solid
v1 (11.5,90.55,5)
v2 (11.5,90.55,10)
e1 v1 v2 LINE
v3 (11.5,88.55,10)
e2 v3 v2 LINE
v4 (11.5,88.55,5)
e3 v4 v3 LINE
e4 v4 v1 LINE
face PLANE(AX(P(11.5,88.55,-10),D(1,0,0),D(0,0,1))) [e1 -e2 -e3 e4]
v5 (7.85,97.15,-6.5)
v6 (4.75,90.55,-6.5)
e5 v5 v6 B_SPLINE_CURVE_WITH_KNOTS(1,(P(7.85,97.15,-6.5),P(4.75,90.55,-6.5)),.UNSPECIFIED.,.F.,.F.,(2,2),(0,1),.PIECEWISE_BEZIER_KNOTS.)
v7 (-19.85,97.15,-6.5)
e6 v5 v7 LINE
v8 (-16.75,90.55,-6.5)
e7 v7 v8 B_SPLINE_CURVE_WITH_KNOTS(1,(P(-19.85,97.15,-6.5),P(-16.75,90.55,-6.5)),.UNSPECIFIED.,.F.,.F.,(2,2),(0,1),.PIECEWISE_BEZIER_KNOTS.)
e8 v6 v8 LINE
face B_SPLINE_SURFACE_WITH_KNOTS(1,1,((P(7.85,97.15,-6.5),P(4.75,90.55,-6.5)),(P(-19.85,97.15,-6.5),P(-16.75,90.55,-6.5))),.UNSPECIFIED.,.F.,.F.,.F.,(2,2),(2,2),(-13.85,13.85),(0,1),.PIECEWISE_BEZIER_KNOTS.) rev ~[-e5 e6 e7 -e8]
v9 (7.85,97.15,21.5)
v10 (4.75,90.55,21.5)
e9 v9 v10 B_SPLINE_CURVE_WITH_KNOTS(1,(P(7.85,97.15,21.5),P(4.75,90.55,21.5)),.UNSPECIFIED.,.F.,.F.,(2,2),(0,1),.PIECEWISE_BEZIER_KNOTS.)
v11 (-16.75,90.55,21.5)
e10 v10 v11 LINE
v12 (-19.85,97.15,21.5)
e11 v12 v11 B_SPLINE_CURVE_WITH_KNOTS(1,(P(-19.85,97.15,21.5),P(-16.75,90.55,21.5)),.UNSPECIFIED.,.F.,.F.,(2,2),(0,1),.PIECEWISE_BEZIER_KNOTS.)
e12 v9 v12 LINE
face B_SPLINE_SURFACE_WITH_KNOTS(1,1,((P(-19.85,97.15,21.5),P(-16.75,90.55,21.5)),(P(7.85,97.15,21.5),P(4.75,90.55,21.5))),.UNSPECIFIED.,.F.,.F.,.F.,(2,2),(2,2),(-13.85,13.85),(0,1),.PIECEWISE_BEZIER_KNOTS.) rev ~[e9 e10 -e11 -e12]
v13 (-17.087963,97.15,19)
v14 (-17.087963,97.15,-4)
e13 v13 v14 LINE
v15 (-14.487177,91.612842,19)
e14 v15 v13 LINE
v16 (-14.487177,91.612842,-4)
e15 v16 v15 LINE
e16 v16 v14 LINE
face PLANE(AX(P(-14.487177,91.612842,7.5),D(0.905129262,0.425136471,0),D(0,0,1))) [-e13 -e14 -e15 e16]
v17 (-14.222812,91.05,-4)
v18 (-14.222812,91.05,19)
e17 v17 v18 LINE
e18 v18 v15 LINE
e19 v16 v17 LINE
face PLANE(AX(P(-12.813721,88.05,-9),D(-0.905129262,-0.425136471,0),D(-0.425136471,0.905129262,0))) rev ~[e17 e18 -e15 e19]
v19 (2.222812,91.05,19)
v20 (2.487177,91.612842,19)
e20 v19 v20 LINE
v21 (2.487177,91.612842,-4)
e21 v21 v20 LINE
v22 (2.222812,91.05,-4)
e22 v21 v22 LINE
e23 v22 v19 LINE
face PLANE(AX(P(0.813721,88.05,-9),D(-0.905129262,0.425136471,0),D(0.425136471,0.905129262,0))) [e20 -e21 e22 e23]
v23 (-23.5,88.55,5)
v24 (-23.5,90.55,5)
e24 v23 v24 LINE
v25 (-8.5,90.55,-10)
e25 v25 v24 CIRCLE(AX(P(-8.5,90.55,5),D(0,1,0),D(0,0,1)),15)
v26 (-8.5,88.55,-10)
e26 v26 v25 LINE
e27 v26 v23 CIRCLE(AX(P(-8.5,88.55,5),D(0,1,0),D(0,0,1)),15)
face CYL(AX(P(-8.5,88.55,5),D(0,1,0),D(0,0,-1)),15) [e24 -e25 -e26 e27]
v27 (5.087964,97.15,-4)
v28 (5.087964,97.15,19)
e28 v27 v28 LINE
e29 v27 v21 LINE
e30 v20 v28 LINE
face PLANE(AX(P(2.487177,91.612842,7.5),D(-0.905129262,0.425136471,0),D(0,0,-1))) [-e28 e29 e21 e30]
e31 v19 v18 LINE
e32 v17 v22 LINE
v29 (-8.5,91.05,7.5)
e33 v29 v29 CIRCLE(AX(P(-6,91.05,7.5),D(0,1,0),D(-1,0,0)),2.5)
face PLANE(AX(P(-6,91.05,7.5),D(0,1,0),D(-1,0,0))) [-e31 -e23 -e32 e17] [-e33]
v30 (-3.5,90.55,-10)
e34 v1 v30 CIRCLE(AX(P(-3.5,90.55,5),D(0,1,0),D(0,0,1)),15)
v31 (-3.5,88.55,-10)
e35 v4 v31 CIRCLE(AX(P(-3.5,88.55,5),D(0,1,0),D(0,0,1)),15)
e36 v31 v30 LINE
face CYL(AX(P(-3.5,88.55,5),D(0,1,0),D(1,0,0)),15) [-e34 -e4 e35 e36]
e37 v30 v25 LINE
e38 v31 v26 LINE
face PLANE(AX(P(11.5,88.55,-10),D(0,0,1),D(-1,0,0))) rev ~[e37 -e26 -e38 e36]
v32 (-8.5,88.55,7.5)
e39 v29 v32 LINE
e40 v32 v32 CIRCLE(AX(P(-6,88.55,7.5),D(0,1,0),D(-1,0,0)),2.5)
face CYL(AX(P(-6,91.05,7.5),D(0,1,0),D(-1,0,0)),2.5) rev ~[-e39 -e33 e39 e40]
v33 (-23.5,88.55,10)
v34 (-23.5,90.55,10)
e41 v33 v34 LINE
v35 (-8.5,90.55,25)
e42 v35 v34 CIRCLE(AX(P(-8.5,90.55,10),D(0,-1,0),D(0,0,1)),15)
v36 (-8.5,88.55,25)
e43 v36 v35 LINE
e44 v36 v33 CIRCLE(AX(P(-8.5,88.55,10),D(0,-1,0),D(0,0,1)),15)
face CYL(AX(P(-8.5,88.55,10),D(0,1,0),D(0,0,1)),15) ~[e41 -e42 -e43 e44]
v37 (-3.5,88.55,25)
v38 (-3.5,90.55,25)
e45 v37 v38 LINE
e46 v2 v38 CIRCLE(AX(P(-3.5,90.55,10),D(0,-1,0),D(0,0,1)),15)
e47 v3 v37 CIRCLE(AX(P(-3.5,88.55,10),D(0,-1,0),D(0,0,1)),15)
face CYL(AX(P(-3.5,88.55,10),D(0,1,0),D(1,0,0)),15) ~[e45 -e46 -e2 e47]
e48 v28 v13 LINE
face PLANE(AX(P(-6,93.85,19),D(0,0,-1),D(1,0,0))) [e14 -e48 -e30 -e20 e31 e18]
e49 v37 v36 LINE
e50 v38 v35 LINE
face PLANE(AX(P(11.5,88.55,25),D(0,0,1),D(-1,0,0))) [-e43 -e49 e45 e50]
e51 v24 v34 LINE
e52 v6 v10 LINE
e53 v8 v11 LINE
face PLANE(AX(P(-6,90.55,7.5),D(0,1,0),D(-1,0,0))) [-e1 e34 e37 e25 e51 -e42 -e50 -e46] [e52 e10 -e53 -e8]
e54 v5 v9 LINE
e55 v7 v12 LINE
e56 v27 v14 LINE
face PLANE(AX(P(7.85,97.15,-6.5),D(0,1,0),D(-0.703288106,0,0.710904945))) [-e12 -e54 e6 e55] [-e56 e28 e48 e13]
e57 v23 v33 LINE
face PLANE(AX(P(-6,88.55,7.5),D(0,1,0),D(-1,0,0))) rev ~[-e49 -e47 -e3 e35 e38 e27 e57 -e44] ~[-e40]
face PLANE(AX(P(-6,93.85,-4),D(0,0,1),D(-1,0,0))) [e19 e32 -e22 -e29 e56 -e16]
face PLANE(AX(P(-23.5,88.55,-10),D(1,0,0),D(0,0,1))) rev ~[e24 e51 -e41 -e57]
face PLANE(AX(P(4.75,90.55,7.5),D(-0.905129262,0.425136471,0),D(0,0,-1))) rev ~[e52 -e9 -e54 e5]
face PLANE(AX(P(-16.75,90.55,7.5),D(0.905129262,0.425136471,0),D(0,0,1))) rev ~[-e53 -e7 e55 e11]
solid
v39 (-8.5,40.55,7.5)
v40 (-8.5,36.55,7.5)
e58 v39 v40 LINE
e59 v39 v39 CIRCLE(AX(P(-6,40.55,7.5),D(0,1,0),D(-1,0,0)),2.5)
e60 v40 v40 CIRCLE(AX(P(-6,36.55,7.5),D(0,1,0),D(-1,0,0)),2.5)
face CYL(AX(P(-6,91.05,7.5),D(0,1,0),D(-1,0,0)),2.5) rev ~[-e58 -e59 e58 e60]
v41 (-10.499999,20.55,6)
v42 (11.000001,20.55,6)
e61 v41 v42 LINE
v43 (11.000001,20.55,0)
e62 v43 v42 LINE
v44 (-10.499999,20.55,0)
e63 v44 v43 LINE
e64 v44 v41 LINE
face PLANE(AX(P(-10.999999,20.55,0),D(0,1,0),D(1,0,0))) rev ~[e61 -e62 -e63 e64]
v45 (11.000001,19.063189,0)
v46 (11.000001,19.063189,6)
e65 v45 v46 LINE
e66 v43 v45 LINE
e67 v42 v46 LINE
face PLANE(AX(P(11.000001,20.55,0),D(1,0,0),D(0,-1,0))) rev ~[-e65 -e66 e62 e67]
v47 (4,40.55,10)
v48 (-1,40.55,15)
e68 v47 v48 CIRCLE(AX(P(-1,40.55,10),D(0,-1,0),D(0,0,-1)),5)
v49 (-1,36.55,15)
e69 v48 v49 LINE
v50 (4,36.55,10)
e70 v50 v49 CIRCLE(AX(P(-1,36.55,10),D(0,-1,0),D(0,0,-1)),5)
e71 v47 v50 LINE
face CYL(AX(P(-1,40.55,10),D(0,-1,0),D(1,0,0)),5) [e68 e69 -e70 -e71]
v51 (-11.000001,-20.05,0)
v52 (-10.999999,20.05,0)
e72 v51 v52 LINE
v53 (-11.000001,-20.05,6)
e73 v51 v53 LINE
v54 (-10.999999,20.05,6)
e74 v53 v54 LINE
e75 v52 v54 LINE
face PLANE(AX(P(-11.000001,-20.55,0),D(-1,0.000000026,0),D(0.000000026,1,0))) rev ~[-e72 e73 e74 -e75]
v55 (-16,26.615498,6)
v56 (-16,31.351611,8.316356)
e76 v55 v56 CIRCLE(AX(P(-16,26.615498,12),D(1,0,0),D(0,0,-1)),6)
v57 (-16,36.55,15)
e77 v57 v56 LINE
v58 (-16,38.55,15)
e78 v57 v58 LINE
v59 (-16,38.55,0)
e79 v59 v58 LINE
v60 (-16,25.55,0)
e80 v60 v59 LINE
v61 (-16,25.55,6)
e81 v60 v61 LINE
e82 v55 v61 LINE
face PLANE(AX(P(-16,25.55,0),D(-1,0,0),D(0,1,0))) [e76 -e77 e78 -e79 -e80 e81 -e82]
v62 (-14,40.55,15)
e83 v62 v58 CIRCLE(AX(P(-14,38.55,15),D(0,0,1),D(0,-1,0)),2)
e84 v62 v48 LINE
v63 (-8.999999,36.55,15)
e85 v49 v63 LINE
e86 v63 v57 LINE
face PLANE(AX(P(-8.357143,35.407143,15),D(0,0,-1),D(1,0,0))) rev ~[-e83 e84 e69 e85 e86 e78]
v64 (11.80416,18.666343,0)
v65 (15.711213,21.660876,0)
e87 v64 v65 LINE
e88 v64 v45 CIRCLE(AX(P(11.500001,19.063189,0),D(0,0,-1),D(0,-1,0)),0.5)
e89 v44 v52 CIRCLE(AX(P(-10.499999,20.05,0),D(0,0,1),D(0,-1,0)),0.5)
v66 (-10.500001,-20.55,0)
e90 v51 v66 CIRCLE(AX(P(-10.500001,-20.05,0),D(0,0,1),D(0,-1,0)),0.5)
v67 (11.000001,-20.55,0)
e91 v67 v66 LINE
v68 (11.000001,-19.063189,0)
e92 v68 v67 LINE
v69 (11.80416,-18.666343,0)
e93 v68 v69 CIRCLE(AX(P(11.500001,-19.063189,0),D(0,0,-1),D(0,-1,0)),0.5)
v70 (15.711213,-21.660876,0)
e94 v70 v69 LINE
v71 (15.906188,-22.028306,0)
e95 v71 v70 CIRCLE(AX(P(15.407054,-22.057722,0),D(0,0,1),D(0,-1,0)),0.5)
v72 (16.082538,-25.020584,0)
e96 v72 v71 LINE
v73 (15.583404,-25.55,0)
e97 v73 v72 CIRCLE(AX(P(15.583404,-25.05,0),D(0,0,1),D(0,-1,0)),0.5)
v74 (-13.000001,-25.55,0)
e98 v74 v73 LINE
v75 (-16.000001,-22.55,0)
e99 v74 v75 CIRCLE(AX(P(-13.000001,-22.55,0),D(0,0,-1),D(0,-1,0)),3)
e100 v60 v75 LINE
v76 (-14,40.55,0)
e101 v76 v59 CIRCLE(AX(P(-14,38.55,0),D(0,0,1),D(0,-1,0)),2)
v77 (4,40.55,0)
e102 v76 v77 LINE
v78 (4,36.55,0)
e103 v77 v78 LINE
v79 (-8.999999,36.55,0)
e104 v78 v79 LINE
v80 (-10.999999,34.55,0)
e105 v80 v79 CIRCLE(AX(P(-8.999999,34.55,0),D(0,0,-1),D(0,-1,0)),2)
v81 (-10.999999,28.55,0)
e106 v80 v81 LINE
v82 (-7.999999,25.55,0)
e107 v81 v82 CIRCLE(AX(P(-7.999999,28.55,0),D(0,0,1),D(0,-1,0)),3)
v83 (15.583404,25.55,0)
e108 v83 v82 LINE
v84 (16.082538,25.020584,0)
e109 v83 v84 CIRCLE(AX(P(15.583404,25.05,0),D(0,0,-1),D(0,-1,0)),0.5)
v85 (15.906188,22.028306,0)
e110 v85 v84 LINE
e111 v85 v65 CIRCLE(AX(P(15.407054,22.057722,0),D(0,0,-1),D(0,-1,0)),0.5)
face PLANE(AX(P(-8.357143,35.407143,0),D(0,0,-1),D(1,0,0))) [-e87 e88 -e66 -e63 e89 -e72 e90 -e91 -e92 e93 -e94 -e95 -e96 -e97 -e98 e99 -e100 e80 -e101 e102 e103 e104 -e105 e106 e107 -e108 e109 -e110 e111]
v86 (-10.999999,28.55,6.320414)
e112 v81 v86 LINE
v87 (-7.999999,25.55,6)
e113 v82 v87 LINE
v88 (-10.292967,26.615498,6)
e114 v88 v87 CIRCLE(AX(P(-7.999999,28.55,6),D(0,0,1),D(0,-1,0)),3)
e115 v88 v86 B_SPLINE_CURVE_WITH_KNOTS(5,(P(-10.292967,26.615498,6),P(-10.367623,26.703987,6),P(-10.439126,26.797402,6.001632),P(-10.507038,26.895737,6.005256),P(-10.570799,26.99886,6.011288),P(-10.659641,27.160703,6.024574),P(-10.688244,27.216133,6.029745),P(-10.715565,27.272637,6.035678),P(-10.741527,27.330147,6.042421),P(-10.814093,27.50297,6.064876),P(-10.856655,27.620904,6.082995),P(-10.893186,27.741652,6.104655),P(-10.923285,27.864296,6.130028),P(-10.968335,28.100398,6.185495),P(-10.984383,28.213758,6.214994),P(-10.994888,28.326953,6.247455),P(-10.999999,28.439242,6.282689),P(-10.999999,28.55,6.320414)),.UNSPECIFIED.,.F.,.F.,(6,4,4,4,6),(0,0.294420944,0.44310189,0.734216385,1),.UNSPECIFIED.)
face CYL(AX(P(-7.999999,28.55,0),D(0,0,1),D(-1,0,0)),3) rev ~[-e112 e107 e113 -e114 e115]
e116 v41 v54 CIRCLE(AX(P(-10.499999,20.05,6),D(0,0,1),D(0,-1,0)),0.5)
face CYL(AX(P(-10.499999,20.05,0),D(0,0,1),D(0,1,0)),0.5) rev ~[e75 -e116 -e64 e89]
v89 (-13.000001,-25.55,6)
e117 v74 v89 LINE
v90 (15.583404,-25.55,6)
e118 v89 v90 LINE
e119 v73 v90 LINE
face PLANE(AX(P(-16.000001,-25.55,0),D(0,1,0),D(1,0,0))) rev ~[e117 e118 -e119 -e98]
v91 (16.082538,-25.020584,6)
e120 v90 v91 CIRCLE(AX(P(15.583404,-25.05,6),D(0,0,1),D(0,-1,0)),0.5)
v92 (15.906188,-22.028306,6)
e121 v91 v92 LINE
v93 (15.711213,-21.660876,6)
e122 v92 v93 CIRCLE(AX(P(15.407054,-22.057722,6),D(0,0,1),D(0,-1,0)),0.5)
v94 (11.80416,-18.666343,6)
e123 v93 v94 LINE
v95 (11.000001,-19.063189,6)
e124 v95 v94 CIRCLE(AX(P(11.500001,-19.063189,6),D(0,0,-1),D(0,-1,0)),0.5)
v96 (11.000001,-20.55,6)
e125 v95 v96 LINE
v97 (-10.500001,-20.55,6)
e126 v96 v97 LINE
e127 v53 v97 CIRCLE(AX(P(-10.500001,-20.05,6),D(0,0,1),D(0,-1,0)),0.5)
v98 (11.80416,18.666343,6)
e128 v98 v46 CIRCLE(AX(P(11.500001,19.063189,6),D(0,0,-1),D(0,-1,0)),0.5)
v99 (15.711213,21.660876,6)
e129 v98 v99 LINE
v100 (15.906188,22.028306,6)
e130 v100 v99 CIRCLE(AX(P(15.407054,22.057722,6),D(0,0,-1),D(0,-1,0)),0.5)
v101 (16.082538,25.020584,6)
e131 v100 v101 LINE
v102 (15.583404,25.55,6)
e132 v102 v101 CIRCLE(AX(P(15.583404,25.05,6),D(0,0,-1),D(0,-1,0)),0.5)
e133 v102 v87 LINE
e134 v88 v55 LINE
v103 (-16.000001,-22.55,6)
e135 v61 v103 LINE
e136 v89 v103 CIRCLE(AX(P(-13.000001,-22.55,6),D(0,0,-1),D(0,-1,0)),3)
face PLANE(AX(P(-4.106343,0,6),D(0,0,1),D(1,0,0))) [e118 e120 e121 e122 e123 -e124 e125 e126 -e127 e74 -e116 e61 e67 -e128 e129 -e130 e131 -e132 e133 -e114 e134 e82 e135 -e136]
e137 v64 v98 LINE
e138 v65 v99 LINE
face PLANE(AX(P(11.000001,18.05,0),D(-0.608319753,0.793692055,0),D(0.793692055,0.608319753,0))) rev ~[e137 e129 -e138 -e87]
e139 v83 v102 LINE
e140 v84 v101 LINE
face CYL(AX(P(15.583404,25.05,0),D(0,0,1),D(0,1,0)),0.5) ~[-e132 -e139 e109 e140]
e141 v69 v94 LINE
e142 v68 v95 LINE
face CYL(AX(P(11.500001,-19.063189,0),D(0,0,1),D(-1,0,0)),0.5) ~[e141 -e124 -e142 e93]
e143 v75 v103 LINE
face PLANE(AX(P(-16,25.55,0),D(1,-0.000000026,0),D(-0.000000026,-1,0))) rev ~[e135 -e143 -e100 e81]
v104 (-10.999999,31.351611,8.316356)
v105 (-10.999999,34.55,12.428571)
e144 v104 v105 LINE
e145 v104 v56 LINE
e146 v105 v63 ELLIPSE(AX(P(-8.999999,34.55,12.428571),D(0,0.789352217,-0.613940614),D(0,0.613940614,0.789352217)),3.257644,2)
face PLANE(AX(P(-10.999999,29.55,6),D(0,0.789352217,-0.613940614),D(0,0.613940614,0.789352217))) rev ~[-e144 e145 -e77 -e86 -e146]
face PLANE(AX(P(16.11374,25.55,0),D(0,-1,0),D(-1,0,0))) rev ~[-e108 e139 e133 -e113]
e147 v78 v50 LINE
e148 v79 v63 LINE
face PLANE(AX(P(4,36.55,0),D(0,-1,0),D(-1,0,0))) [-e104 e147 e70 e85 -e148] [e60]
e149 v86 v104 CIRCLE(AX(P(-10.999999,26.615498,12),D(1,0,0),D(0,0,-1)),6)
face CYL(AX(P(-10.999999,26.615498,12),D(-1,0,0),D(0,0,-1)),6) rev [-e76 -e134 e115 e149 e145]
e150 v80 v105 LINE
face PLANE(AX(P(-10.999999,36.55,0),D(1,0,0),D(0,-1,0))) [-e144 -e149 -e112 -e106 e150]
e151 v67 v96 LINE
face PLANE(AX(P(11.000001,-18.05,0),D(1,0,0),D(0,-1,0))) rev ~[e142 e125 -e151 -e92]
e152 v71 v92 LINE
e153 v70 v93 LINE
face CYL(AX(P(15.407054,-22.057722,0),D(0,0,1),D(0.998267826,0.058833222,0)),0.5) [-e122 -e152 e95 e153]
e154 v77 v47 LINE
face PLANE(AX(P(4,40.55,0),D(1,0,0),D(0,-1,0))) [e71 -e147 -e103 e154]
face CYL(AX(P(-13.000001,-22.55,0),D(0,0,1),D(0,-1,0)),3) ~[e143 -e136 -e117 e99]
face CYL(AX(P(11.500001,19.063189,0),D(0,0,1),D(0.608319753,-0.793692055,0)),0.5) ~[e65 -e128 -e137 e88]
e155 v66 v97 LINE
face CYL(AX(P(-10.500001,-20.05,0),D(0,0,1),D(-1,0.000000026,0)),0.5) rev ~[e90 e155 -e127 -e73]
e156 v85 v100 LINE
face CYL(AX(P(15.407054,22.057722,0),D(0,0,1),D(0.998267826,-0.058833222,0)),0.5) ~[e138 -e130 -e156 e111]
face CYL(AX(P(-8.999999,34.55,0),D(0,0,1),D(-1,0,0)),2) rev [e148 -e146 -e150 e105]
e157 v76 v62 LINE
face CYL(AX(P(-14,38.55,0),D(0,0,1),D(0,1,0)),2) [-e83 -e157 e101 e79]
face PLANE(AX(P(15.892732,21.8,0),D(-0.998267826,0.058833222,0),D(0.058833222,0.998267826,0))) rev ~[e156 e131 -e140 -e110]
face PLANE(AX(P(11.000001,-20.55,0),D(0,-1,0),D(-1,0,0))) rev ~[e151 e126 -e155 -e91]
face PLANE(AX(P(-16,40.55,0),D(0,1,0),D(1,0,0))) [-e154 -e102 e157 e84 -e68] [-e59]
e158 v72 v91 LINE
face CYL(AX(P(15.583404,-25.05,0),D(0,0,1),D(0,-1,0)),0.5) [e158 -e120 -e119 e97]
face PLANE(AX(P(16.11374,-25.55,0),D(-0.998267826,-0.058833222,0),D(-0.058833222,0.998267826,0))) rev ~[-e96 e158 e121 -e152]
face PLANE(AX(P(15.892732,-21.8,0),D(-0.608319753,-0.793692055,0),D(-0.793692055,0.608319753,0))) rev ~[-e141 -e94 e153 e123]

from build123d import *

# Parameters (mm, degrees)
F1_DEPTH     = 6
F3_DEPTH     = 15
F5_DEPTH     = 5.0000008951
F6_R         = 5
F10_DEPTH    = 5
F11_W        = 35
F11_H        = 35
F12_DEPTH    = 2
F15_W        = 27.7
F15_H        = 28
F13_W        = 21.5
F13_H        = 28
F17_T        = 2.5
F17_T3_DEPTH = 26.5
F17_T5_DEPTH = 33
F19_R        = 2.5
F20_DEPTH    = 54.5
F21_R        = 15
F22_R        = 3
F23_R        = 0.5
F24_R        = 2
F25_R        = 6


# Not quite as in the source:
# - ends of sketch curves that miss each other by under 0.0002 mm in the source are joined
# - a shell that OpenCascade refuses in one call is made with other operations: the cavity is built on its own and cut out


with BuildPart() as f1:
    # F0 (on Top) → F1 (new body)
    with BuildSketch(Plane.XY):
        Polygon((11.0000005256, -18.05), (11.0000005256, -20.55), (-11.0000005256, -20.55), (-10.9999994744, 20.55), (11.0000005256, 20.55), (11.0000005256, 18.05), (15.8927322497, 21.8000001848), (16.1137396651, 25.5500003695), (11.4420153564, 25.5500003695), (-15.9999997161, 25.5500003695), (-16.000001023, -25.5500003695), (11.4420153564, -25.5500003695), (16.1137396651, -25.5500003695), (15.8927322497, -21.8000001848), align=None)
    extrude(amount=F1_DEPTH)

    # F2 (on face) → F3 (join)
    with BuildSketch(Plane(origin=(0, 0, 0), x_dir=(1, 0, 0), z_dir=(0, 0, -1))):
        Polygon((-10.9999994744, -25.5500003695), (-15.9999997161, -25.5500003695), (-15.9999997161, -40.5500003695), (-10.9999994744, -40.5500003695), (4.0000002839, -40.5500003695), (4.0000002839, -36.5500003695), (-10.9999994744, -36.5500003695), align=None)
    extrude(amount=-F3_DEPTH)

    # F4 (on face) → F5 (cut, through all)
    with BuildSketch(Plane.YZ.offset(-10.9999994744)):
        Polygon((25.5500003695, 15), (25.5500003695, 6), (29.5500003695, 6), (36.5500003695, 15), align=None)
    extrude(amount=-F5_DEPTH, mode=Mode.SUBTRACT)

    # F6
    f6_edges = [f1.edges().sort_by_distance(p)[0] for p in [
        (4, 38.55, 15),
    ]]
    fillet(f6_edges, radius=F6_R)


with BuildPart() as f10:
    # F9 (on offset) → F10 (new body)
    with BuildSketch(Plane(origin=(0, 65.5500003695, 0), x_dir=(-1, 0, 0), z_dir=(0, 1, 0))):
        with BuildLine():
            Line((15.9999997161, 0), (15.9999997161, 15))
            Line((15.9999997161, 15), (0.9999997161, 15))
            ThreePointArc((0.9999997161, 15), (-2.5355341898, 13.5355339059), (-4.0000002839, 10))
            Line((-4.0000002839, 10), (-4.0000002839, 0))
            Line((-4.0000002839, 0), (15.9999997161, 0))
        make_face()
    extrude(amount=F10_DEPTH)


with BuildPart() as f12:
    # F11 (on offset) → F12 (new body)
    with BuildSketch(Plane(origin=(0, 88.5500003695, 0), x_dir=(-1, 0, 0), z_dir=(0, 1, 0))):
        with Locations((5.9999997161, 7.5)):
            Rectangle(F11_W, F11_H)
    extrude(amount=F12_DEPTH)

    # F15 (on offset) → F16 section 0
    with BuildSketch(Plane(origin=(0, 97.1500003695, 0), x_dir=(-1, 0, 0), z_dir=(0, 1, 0))):
        with Locations((5.9999997161, 7.5)):
            Rectangle(F15_W, F15_H)
    # F13 (on face) → F16 section 1
    with BuildSketch(Plane(origin=(0, 90.5500003695, 0), x_dir=(-1, 0, 0), z_dir=(0, 1, 0))):
        with Locations((5.9999997161, 7.5)):
            Rectangle(F13_W, F13_H)
    loft()

    # F17: shell of thickness 2.5, made by hand


with BuildPart() as f17_core1:
    # F17_t2: copy of F12
    add(f12.part)

    # the walls: a layer under each face that stays
    f17_faces = [f17_core1.faces().sort_by_distance(p)[0] for p in [
        (-5.9999997161, 89.5500003695, -10),
        (11.5000002839, 89.5500003695, 7.5),
        (-23.4999997161, 89.5500003695, 7.5),
        (-5.9999997161, 88.5500003695, 7.5),
        (5.6666669506, 90.5500003695, -4.1666666667),
        (-5.9999997161, 89.5500003695, 25),
        (-5.9999997161, 93.8500003695, -6.5),
        (-18.2999997161, 93.8500003695, 7.5),
        (-5.9999997161, 93.8500003695, 21.5),
        (6.3000002839, 93.8500003695, 7.5),
    ]]
    thicken(f17_faces, amount=-F17_T, mode=Mode.SUBTRACT)

    # F17_s4 → F17_t3 (cut)
    with BuildSketch(Plane.YZ.offset(-19.2499997161)):
        Polygon((90.5750003695, -6.525), (88.0500003695, -6.5), (88.0500003695, -4), (90.5500003695, -4), align=None)
        Polygon((90.5750003695, 21.525), (88.0500003695, 21.5), (88.0500003695, 19), (90.5500003695, 19), align=None)
    extrude(amount=F17_T3_DEPTH, mode=Mode.SUBTRACT)

    # F17_s6 → F17_t5 (cut)
    with BuildSketch(Plane.XY.offset(-9)):
        Polygon((-16.7726279476, 90.5643719578), (-16.7499997161, 88.0500003695), (-12.8137208564, 88.0500003695), (-14.4871765615, 91.6128415482), align=None)
        Polygon((4.7726285154, 90.5643719578), (4.7500002839, 88.0500003695), (0.8137214242, 88.0500003695), (2.4871771293, 91.6128415482), align=None)
    extrude(amount=F17_T5_DEPTH, mode=Mode.SUBTRACT)


with BuildPart() as f12_1:
    add(f12.part)

    # what is left inside the walls is the cavity
    f17_cavity = [f17_core1.part.solids().sort_by_distance(p)[0] for p in [
        (-2.215544, 97.125, 11.243908),
    ]]
    add(f17_cavity, mode=Mode.SUBTRACT)


with BuildPart() as f20_tool:
    # F19 (on face) → F20 (new body, through all)
    with BuildSketch(Plane(origin=(0, 91.0500003695, 0), x_dir=(-1, 0, 0), z_dir=(0, 1, 0))):
        with Locations((5.9999997161, 7.5)):
            Circle(F19_R)
    extrude(amount=-F20_DEPTH)


with BuildPart() as f1_1:
    add(f1.part)

    # F20: cut by f20_tool
    add(f20_tool.part, mode=Mode.SUBTRACT)

    # F22
    f22_edges = [f1_1.edges().sort_by_distance(p)[0] for p in [
        (-16.000001, -25.55, 3),
        (-10.999999, 25.55, 3),
    ]]
    fillet(f22_edges, radius=F22_R)

    # F23
    f23_edges = [f1_1.edges().sort_by_distance(p)[0] for p in [
        (11.000001, -18.05, 3),
        (11.000001, 18.05, 3),
        (-10.999999, 20.55, 3),
        (-11.000001, -20.55, 3),
        (16.11374, 25.55, 3),
        (15.892732, 21.8, 3),
        (15.892732, -21.8, 3),
        (16.11374, -25.55, 3),
    ]]
    fillet(f23_edges, radius=F23_R)

    # F24
    f24_edges = [f1_1.edges().sort_by_distance(p)[0] for p in [
        (-16, 40.55, 7.5),
        (-10.999999, 36.55, 7.5),
    ]]
    fillet(f24_edges, radius=F24_R)

    # F25
    f25_edges = [f1_1.edges().sort_by_distance(p)[0] for p in [
        (-13.5, 29.55, 6),
    ]]
    fillet(f25_edges, radius=F25_R)


with BuildPart() as f12_2:
    add(f12_1.part)

    # F20: cut by f20_tool
    add(f20_tool.part, mode=Mode.SUBTRACT)

    # F21
    f21_edges = [f12_2.edges().sort_by_distance(p)[0] for p in [
        (11.5, 89.55, 25),
        (-23.5, 89.55, 25),
        (-23.5, 89.55, -10),
        (11.5, 89.55, -10),
    ]]
    fillet(f21_edges, radius=F21_R)


solid = Compound([f1_1.part, f12_2.part])
